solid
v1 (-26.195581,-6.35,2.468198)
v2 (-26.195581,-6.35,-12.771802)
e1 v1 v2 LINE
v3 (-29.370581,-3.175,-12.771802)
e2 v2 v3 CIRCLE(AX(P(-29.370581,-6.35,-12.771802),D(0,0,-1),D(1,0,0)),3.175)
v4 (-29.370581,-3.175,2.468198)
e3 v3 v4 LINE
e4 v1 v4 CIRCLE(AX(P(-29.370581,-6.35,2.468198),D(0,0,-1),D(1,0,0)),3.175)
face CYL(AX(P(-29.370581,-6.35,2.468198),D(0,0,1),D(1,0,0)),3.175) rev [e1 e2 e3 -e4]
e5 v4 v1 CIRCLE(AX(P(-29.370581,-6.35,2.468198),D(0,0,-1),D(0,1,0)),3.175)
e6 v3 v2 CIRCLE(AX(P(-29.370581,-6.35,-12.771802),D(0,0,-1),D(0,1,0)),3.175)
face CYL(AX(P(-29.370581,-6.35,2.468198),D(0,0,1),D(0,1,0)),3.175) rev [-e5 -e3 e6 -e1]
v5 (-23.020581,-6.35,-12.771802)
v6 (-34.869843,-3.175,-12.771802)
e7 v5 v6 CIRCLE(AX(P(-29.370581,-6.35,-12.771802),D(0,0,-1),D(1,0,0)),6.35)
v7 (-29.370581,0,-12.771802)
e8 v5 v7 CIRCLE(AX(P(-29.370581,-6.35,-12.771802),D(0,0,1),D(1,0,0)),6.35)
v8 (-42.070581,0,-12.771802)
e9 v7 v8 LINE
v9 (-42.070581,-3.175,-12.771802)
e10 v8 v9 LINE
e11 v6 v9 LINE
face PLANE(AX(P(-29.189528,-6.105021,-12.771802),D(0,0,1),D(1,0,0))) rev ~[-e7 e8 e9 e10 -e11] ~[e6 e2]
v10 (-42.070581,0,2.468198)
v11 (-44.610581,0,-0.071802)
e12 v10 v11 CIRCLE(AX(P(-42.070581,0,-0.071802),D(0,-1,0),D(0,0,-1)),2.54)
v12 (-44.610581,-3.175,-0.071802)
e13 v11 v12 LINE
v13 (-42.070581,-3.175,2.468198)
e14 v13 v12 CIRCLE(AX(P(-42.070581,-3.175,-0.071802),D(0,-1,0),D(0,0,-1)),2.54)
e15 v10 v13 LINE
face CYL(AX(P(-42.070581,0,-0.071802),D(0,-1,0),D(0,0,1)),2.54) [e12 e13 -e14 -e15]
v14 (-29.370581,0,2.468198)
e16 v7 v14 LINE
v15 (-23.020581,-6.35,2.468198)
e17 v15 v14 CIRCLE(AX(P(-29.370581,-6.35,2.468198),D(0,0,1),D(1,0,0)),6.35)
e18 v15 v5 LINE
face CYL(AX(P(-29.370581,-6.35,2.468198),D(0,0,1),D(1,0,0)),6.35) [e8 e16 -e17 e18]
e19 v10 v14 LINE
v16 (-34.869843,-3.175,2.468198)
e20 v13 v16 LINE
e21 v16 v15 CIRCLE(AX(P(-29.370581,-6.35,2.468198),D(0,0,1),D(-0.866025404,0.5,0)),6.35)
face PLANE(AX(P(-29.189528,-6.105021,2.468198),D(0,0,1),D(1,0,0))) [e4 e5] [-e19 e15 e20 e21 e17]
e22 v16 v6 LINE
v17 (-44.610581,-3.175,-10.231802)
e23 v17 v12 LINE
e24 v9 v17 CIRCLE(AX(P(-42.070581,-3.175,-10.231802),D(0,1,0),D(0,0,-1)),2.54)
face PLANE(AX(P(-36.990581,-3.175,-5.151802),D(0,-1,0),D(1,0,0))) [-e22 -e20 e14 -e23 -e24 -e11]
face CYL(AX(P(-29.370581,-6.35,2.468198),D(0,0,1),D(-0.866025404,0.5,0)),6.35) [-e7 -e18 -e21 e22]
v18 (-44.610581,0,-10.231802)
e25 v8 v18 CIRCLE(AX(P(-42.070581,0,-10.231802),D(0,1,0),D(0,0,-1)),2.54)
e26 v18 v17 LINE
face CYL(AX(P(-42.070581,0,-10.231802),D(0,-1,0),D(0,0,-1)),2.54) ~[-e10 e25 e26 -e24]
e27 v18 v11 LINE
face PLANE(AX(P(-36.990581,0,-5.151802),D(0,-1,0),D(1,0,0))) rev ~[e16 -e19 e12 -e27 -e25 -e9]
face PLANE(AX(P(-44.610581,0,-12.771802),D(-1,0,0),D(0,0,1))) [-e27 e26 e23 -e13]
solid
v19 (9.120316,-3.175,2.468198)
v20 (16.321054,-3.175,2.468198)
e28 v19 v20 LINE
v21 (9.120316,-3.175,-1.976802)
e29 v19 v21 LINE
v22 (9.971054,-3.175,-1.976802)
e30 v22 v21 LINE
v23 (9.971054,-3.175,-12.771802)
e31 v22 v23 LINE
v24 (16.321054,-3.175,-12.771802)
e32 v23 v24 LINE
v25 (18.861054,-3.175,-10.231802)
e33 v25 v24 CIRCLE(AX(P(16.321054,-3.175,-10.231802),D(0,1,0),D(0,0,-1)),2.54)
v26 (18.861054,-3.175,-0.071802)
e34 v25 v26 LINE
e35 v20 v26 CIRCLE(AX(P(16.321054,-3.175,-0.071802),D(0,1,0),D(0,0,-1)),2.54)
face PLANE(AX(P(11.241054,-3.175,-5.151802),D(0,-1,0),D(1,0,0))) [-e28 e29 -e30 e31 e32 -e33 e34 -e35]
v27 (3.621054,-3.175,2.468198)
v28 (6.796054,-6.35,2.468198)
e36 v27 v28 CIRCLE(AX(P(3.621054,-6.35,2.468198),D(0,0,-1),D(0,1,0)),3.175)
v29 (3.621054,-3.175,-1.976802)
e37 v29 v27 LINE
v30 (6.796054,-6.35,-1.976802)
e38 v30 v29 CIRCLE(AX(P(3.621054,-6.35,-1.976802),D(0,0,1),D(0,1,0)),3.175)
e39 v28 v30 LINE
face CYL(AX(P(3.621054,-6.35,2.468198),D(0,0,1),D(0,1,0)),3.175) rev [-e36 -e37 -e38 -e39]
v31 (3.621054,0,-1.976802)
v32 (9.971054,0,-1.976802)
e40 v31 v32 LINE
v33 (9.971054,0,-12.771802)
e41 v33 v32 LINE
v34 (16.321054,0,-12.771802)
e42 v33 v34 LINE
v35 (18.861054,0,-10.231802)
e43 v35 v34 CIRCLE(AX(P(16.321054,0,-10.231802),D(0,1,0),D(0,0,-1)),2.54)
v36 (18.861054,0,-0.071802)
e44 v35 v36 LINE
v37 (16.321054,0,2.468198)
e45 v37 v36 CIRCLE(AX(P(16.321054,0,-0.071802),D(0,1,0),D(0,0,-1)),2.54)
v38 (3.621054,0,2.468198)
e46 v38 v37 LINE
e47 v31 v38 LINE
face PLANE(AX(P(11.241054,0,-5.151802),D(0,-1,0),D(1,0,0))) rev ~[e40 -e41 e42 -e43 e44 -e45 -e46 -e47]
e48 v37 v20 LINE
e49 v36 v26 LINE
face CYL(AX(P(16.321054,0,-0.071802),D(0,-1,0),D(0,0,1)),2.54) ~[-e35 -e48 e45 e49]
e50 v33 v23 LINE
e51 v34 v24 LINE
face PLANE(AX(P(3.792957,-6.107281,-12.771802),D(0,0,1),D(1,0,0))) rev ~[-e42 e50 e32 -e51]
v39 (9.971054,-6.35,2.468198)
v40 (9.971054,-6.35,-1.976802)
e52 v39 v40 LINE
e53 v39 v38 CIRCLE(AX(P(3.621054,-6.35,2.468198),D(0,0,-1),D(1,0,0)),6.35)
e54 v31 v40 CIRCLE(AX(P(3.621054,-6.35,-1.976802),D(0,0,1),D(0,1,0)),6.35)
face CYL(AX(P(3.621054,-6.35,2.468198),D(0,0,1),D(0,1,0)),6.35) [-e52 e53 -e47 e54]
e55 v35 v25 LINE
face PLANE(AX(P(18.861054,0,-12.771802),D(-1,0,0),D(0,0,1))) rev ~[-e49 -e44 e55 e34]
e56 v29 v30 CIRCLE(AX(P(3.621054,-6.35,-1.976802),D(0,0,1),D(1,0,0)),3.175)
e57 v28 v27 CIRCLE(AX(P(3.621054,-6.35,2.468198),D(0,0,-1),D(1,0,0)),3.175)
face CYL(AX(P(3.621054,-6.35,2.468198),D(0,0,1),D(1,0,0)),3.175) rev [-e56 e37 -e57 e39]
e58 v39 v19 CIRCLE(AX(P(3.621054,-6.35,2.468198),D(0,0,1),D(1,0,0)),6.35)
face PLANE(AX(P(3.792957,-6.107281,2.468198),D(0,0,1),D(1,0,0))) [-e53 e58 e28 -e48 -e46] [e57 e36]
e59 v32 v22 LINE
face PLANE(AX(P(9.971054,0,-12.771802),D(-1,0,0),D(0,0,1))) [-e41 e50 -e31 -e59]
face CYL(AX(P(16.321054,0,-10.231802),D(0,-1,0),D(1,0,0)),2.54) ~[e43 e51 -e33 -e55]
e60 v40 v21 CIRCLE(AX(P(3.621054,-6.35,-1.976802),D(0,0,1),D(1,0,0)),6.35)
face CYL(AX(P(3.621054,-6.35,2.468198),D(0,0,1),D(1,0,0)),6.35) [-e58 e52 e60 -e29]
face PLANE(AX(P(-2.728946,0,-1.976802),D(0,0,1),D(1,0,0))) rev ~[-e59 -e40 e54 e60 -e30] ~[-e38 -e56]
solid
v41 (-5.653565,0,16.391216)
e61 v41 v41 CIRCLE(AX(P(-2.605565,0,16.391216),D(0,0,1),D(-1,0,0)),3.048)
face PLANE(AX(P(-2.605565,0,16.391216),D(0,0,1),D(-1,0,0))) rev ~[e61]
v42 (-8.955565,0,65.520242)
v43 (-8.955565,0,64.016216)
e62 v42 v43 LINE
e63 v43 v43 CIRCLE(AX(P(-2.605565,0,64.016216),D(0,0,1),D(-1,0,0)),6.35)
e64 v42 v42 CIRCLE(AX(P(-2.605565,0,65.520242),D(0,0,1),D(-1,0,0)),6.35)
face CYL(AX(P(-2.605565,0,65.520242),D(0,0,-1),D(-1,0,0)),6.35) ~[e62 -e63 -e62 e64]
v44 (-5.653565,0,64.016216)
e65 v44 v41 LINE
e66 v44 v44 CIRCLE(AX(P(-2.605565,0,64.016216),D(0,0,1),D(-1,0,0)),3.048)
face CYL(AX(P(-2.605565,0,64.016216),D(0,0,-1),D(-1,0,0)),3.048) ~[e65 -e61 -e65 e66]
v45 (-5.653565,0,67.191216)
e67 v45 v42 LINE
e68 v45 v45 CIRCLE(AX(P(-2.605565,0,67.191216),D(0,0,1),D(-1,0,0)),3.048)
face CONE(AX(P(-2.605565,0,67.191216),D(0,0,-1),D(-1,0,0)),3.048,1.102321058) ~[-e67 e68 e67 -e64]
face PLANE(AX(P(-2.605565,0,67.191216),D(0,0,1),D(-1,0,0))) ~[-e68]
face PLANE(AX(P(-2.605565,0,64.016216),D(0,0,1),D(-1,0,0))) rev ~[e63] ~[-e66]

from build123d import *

# Parameters (mm, degrees)
F0_W      = 15.24
F0_H      = 15.24
F1_DEPTH  = 3.175
F3_DEPTH  = 15.24
F5_R      = 2.54
F6_W      = 6.35
F6_H      = 15.24
F7_DEPTH  = 25.4
F8_W      = 15.24
F8_H      = 15.24
F9_DEPTH  = 3.175
F11_DEPTH = 15.24
F12_W     = 12.7
F12_H     = 8.89
F12_W_2   = 6.35
F12_H_2   = 10.795
F13_DEPTH = 25.4
F19_R     = 2.54


# Not quite as in the source:
# - a feature of the source that left no trace in its solid (it failed there, or was rolled back) is left out


with BuildPart() as f1:
    # F0 (on Front) → F1 (new body)
    with BuildSketch(Plane.XZ):
        with Locations((-36.9905814096, -5.1518018644)):
            Rectangle(F0_W, F0_H)
    extrude(amount=F1_DEPTH)

    # F2 (on face) → F3 (join, through all)
    with BuildSketch(Plane.XY.offset(2.4681981356)):
        with BuildLine():
            ThreePointArc((-34.8698427237, -3.175), (-31.014082346, -12.4836289969), (-23.0205814096, -6.35))
            ThreePointArc((-23.0205814096, -6.35), (-24.8804533491, -1.8598719395), (-29.3705814096, 0))
            Line((-29.3705814096, 0), (-29.3705814096, -3.175))
            Line((-29.3705814096, -3.175), (-34.8698427237, -3.175))
        make_face()
        with BuildLine():
            ThreePointArc((-26.1955814096, -6.35), (-31.6156454399, -8.5950640303), (-29.3705814096, -3.175))
            ThreePointArc((-29.3705814096, -3.175), (-27.1255173794, -4.1049359697), (-26.1955814096, -6.35))
        make_face(mode=Mode.SUBTRACT)
        with BuildLine():
            Line((-29.3705814096, -3.175), (-29.3705814096, 0))
            ThreePointArc((-29.3705814096, 0), (-32.5455814096, -0.850738686), (-34.8698427237, -3.175))
            Line((-34.8698427237, -3.175), (-29.3705814096, -3.175))
        make_face()
    extrude(amount=-F3_DEPTH)

    # F5
    f5_edges = [f1.edges().sort_by_distance(p)[0] for p in [
        (-44.610581, -1.5875, 2.468198),
        (-44.610581, -1.5875, -12.771802),
    ]]
    fillet(f5_edges, radius=F5_R)

    # F6 (on face) → F7 (cut)
    with BuildSketch(Plane.XZ):
        with Locations((-32.5455814096, -20.3918018644)):
            Rectangle(F6_W, F6_H)
        with Locations((-26.1955814096, -20.3918018644)):
            Rectangle(F6_W, F6_H)
        Polygon((-35.7205814096, 27.8681981356), (-35.7205814096, 17.7081981356), (-29.3705814096, 17.7081981356), (-29.3705814096, 20.251745157), (-32.0902006372, 27.8681981356), align=None)
        Polygon((-28.4623529462, 17.7081981356), (-23.0205814096, 17.7081981356), (-23.0205814096, 27.8681981356), (-29.3705814096, 27.8681981356), (-29.3705814096, 20.251745157), align=None)
    extrude(amount=F7_DEPTH, mode=Mode.SUBTRACT)


with BuildPart() as f9:
    # F8 (on Front) → F9 (new body)
    with BuildSketch(Plane.XZ):
        with Locations((11.2410542523, -5.1518018644)):
            Rectangle(F8_W, F8_H)
    extrude(amount=F9_DEPTH)

    # F10 (on face) → F11 (join, through all)
    with BuildSketch(Plane.XY.offset(2.4681981356)):
        with BuildLine():
            Line((3.6210542523, -3.175), (3.6210542523, 0))
            ThreePointArc((3.6210542523, 0), (-0.8690738082, -10.8401280605), (9.9710542523, -6.35))
            ThreePointArc((9.9710542523, -6.35), (9.7546832493, -4.7064990636), (9.1203155664, -3.175))
            Line((9.1203155664, -3.175), (3.6210542523, -3.175))
        make_face()
        with BuildLine():
            ThreePointArc((6.7960542523, -6.35), (1.3759902221, -8.5950640303), (3.6210542523, -3.175))
            ThreePointArc((3.6210542523, -3.175), (5.8661182826, -4.1049359697), (6.7960542523, -6.35))
        make_face(mode=Mode.SUBTRACT)
    extrude(amount=-F11_DEPTH)

    # F12 (on face) → F13 (cut)
    with BuildSketch(Plane(origin=(0, 0, 0), x_dir=(-1, 0, 0), z_dir=(0, 1, 0))):
        Polygon((2.7289457477, 18.3431981356), (-9.9710542523, 18.3431981356), (-9.9710542523, 2.4681981356), (-3.6210542523, 2.4681981356), (2.7289457477, 2.4681981356), align=None)
        with Locations((-3.6210542523, 22.7881981356)):
            Rectangle(F12_W, F12_H)
        with Locations((-0.4460542523, -7.3743018644)):
            Rectangle(F12_W_2, F12_H_2)
        with Locations((-6.7960542523, -7.3743018644)):
            Rectangle(F12_W_2, F12_H_2)
    extrude(amount=-F13_DEPTH, mode=Mode.SUBTRACT)

    # F19
    f19_edges = [f9.edges().sort_by_distance(p)[0] for p in [
        (18.861054, -1.5875, 2.468198),
        (18.861054, -1.5875, -12.771802),
    ]]
    fillet(f19_edges, radius=F19_R)


with BuildPart() as f15:
    # F14 (on Front) → F15 (revolve)
    with BuildSketch(Plane.XZ):
        Polygon((-8.9555652812, 64.0162163931), (-5.6535652812, 64.0162163931), (-5.6535652812, 16.3912163931), (-2.6055652812, 16.3912163931), (-2.6055652812, 67.1912163931), (-5.6535652812, 67.1912163931), (-8.9555652812, 65.5202418566), align=None)
    revolve(axis=Axis((-2.6055652812, 0, 41.7912163931), (0, 0, 1)))


solid = Compound([f1.part, f9.part, f15.part])
